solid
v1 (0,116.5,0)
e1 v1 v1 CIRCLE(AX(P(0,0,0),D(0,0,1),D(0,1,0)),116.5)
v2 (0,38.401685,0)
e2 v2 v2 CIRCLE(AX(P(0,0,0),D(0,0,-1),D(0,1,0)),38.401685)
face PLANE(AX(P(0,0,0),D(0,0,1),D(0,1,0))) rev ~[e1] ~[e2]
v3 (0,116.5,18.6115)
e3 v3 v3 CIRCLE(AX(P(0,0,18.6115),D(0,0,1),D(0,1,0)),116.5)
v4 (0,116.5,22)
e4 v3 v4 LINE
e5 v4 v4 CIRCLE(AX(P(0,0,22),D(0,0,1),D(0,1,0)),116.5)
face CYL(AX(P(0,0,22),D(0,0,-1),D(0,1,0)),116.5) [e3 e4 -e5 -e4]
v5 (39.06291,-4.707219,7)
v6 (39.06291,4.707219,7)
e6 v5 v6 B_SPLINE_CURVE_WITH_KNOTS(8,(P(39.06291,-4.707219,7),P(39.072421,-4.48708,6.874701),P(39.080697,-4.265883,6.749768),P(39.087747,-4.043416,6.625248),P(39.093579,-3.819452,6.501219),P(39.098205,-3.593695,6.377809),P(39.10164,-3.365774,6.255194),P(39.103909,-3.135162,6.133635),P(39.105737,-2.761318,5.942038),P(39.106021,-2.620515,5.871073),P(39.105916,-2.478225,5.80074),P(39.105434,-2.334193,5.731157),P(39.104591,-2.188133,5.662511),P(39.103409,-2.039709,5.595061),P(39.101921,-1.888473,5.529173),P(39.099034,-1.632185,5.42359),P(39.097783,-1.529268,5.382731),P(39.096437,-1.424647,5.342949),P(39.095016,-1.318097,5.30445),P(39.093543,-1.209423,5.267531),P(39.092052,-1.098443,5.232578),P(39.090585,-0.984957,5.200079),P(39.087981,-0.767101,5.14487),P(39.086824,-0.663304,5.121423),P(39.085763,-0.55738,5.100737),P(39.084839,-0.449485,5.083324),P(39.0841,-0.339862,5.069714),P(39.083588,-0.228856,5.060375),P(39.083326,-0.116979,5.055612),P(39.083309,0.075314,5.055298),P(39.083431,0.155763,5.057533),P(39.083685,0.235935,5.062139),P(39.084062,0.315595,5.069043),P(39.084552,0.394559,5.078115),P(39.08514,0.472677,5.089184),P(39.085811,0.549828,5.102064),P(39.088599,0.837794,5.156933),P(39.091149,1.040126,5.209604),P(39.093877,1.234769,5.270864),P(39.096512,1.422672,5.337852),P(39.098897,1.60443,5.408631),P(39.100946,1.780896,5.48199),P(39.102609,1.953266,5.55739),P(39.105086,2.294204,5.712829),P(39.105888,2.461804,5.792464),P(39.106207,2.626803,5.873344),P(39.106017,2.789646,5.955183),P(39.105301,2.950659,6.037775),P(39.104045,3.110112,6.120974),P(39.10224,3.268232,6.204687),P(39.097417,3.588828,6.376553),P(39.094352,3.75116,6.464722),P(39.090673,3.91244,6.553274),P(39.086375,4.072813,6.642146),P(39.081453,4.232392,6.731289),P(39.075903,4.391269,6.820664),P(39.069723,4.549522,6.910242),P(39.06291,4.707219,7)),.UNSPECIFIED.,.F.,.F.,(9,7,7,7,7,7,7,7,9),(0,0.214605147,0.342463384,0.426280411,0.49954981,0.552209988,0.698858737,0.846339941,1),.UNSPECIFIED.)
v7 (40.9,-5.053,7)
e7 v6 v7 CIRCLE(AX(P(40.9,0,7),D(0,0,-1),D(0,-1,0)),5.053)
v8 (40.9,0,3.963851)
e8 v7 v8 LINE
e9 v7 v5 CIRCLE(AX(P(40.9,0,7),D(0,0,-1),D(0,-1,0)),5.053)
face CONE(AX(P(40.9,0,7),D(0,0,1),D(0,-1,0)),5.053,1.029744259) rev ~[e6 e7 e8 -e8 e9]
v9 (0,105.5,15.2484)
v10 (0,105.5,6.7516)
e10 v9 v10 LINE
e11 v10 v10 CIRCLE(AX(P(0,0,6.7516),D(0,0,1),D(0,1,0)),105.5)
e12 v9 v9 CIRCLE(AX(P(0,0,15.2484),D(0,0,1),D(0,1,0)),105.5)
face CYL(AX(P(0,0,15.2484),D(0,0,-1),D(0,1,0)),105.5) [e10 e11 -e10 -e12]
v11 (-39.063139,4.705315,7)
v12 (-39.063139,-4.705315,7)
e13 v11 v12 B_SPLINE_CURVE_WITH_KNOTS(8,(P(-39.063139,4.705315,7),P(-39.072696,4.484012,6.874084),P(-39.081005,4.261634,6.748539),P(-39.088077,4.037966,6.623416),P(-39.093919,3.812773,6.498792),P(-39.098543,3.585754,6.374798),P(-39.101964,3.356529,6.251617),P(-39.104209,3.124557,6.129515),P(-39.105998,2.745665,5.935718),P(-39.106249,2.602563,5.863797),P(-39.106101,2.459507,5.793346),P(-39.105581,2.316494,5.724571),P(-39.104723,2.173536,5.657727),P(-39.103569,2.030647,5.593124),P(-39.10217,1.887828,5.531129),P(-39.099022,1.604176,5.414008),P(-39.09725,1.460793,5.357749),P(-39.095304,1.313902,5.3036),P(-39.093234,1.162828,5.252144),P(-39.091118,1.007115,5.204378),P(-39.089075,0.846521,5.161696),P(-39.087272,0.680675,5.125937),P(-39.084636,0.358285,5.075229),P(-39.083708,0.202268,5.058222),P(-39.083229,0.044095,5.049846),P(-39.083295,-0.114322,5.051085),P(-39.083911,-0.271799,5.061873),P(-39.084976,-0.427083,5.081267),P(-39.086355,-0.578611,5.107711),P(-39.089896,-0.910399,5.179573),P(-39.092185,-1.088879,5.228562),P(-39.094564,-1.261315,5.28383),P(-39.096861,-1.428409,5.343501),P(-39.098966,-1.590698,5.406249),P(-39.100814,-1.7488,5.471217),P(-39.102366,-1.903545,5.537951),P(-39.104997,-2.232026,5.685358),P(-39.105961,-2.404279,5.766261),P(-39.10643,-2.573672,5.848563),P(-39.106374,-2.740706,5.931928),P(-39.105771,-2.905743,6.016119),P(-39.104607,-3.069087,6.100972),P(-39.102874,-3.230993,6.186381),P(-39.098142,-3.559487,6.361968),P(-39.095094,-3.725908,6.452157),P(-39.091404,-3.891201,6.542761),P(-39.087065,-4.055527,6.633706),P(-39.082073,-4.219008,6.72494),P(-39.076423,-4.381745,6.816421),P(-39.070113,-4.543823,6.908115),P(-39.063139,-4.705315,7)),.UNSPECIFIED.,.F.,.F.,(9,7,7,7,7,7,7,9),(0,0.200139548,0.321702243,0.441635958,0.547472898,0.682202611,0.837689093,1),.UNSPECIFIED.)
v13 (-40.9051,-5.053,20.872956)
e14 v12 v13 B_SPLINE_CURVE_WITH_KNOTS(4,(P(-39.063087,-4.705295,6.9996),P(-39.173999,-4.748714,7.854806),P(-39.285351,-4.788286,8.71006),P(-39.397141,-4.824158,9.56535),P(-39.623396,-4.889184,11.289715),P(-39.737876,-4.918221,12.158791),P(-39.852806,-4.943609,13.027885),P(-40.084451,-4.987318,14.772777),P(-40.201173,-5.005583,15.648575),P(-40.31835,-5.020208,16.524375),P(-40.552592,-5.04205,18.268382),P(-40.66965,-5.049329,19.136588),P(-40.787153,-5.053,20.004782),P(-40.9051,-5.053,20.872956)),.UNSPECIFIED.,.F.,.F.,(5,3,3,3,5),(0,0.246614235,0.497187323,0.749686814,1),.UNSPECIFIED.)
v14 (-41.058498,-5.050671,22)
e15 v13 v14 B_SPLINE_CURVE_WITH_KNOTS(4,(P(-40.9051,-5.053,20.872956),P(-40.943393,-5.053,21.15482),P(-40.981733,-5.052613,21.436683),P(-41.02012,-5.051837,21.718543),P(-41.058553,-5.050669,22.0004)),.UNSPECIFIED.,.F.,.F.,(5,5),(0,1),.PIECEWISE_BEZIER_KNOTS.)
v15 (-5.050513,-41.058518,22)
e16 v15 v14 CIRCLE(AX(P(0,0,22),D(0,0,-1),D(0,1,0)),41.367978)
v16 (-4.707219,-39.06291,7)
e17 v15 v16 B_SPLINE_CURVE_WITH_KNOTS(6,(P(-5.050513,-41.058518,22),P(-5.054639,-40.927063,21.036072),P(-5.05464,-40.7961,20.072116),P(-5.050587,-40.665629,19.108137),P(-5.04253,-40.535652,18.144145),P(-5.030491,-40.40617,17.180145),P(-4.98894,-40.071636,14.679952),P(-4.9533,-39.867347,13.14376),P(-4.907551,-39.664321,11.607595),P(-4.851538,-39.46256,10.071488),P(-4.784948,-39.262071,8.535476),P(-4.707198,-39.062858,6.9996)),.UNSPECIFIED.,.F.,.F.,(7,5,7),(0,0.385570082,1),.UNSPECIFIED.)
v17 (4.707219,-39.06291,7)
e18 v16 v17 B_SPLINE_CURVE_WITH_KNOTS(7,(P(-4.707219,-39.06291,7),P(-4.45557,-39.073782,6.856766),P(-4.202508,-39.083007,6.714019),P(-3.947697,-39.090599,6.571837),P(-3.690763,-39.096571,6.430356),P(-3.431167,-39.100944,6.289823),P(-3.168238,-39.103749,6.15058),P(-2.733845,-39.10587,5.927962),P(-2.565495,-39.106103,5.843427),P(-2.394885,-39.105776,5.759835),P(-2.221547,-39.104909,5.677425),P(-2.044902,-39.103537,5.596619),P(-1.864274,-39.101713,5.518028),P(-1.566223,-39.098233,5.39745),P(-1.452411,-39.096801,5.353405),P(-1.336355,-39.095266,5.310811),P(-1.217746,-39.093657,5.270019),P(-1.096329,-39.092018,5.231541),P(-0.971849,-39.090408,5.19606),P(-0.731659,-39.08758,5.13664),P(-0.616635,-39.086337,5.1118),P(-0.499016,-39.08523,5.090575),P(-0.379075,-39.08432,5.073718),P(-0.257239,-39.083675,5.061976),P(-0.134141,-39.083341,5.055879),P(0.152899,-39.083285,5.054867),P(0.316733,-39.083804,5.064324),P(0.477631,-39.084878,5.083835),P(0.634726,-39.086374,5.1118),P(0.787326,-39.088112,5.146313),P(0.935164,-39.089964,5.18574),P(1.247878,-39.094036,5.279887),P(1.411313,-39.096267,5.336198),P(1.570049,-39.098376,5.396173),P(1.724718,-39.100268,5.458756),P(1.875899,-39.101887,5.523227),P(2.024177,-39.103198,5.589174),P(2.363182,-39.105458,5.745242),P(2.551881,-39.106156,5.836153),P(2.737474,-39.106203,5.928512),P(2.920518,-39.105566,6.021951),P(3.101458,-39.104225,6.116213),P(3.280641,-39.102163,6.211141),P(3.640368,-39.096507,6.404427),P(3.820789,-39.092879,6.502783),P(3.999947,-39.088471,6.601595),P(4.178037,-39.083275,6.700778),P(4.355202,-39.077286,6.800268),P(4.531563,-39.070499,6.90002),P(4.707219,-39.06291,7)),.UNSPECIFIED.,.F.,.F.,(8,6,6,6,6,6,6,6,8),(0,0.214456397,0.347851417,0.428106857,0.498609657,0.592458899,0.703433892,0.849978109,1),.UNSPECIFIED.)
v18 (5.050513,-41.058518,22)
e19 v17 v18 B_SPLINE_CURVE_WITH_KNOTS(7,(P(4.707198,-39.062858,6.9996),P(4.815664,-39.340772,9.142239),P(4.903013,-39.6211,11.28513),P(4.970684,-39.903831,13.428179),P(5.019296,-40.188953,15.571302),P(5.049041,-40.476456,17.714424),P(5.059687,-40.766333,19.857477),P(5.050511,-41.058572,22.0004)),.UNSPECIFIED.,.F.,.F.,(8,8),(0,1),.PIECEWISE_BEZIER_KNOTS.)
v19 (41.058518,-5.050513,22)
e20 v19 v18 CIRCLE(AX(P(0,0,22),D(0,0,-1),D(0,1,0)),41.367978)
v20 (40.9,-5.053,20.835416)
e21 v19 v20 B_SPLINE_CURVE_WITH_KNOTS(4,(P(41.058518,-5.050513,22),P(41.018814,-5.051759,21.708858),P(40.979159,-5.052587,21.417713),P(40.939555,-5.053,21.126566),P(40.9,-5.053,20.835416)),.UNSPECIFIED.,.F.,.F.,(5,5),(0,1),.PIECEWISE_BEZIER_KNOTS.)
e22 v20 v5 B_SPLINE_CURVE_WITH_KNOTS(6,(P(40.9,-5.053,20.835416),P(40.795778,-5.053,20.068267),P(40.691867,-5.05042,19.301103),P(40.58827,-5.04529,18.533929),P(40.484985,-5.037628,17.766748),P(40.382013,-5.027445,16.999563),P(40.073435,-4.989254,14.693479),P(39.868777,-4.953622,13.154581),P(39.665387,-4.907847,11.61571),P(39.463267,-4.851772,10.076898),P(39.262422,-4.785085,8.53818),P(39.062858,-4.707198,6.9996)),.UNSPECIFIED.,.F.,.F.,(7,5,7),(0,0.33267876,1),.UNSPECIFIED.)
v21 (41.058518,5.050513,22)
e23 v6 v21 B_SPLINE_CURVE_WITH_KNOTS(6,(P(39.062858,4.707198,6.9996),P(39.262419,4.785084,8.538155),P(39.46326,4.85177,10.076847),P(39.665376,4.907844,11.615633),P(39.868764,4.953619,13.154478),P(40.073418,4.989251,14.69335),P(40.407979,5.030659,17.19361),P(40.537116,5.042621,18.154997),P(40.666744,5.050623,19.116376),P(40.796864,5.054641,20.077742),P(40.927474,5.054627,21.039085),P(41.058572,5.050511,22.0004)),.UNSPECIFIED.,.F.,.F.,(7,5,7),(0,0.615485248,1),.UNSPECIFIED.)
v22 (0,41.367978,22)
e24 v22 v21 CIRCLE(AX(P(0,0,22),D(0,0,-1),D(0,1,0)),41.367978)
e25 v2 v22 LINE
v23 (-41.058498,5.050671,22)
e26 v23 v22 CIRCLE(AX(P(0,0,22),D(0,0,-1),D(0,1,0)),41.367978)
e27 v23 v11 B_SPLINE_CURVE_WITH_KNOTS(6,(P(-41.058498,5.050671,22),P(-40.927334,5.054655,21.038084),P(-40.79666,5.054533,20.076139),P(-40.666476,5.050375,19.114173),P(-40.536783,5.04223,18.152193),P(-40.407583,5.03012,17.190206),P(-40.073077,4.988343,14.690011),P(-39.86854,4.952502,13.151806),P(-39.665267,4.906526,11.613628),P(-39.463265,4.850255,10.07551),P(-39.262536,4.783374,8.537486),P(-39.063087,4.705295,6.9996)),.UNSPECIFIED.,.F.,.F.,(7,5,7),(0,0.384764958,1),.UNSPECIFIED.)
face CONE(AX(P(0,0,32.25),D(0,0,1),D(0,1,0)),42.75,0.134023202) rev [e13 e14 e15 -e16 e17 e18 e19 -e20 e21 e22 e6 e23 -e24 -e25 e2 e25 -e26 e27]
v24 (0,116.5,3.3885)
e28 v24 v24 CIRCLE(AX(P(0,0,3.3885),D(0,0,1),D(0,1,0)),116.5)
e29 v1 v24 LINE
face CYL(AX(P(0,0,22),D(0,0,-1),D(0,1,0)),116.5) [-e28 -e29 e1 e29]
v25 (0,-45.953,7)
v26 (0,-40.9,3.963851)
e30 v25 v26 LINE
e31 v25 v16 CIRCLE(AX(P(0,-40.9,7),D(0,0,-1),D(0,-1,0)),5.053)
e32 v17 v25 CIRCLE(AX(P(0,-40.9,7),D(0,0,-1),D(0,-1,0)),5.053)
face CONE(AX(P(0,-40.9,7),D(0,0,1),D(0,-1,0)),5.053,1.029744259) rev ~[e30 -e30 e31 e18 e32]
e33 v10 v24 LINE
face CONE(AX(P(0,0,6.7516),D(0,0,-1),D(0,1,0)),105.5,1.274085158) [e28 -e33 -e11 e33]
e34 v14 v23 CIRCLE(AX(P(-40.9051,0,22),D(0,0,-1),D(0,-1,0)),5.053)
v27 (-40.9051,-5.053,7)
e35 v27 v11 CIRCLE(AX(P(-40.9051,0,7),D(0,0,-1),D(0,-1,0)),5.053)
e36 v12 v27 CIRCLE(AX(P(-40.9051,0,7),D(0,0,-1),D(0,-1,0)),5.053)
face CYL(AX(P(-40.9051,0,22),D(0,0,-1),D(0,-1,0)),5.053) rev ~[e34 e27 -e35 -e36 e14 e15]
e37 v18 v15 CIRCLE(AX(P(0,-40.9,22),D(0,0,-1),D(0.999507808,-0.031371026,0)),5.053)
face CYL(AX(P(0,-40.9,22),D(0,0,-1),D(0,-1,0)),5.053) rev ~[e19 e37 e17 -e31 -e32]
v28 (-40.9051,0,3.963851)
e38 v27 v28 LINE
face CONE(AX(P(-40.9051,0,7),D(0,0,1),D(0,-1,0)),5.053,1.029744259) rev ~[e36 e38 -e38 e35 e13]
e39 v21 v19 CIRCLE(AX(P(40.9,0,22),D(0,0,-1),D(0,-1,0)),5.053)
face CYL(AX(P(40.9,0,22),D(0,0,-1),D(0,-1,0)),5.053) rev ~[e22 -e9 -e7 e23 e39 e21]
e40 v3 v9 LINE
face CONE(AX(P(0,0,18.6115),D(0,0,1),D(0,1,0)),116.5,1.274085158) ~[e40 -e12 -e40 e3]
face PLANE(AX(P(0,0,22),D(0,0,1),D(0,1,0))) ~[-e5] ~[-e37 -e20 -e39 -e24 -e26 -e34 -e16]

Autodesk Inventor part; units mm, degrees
ref_plane "XZ Plane" through (0, 0, 0) normal (0, 1, 0) x (-1, 0, 0)
ref_plane "XY Plane" through (0, 0, 0) normal (0, 0, 1) x (1, 0, 0)
sketch "Esquisse principale" plane through (0, 0, 0) normal (1, 0, 0) x (0, 1, 0)
  line L0 (0, 22) -> (116.5, 22)
  line L1 (116.5, 22) -> (116.5, 18.6115)
  line L2 (116.5, 18.6115) -> (105.5, 15.2484)
  line L3 (105.5, 15.2484) -> (105.5, 6.7516)
  line L4 (105.5, 6.7516) -> (116.5, 3.3885)
  line L5 (116.5, 3.3885) -> (116.5, 0)
  line L6 (116.5, 0) -> (0, 0)
  line L7 (114.5, 18) -> (114.5, 4) construction
  line L8 (105.5, 11) -> (114.5, 11) construction
  line L9 (116.5, 18.6115) -> (116.5, 3.3885)
  line L10 (0, -4.4) -> (0, 26.4) projected
  line L11 (0, 0) -> (0, 22)
  dimension "d0" = 14
  dimension "d1" = 34
  dimension "d2" = 2
  dimension "d6" = 22
  dimension "d21" = 229
  dimension "d25" = 11
  dimension "d27" = 11
ref_plane "Plan de courroie" through (0, 105.5, 11) normal (0, 0, 1) x (1, 0, 0)
revolve "Corps" add sketch "Esquisse principale" angle 360 about axis through (0, 0, -10) along (0, 0, 1)
revolve "Bord" cut sketch "Esquisse principale" angle 360 about axis through (0, 0, -10) along (0, 0, 1) contours L9 L4 L3 L2
fillet "Congé externe" [suppressed]
fillet "Congé interne" [suppressed]
sketch "Esquisse4" plane through (0, 0, 0) normal (1, 0, 0) x (0, 1, 0)
  line L0 (0, -20.2967) -> (0, 37.5815)
  line L1 (12.5, 32.25) -> (12.5, -12.25)
  line L2 (12.5, -12.25) -> (36.75, -12.25)
  line L3 (12.5, 32.25) -> (42.75, 32.25)
  line L4 (42.75, 32.25) -> (36.75, -12.25)
  line L5 (-116.5, 0) -> (116.5, 0) projected
  line L6 (12.5, 32.25) -> (0, 32.25)
  line L7 (12.5, -12.25) -> (0, -12.25)
  line L8 (0, -12.25) -> (0, 32.25)
  point P0 (0, 0)
  point P1 (0, 0)
  point P2 (12.5, 0)
  dimension "d48" = 12.5
  dimension "d49" = 73.5
  dimension "d50" = 85.5
  dimension "d51" = 44.5
  dimension "d52" = 12.25
revolve "Révolution3" cut sketch "Esquisse4" angle 360 about axis through (0, 0, -20.2967) along (0, 0, 1) contours L0 L6 L1 L5 | L1 L5 L4 L2 | L1 L3 L4 L5
sketch "Esquisse5" plane through (0, 0, 22) normal (0, 0, 1) x (1, 0, 0)
  line L0 (0, 0) -> (97.3173, 0)
  line L1 (0, 0) -> (-92.8604, 0)
  line L2 (0, 0) -> (0, -102.459)
  circle A0 centre (0, 0) radius 40.9
  point P0 (0, 0)
  point P1 (0, -40.9)
  point P2 (-40.9051, 0)
  point P3 (40.9, 0)
  dimension "d68" = 81.8
hole "Perçage3" at (0, -40.9, 22) at (-40.9051, 0, 22) at (40.9, 0, 22) direction (0, 0, -1) diameter 10.106 depth 15 tip angle 118 thread size "M12x1.75" class "6H" standard "ANSI Metric M Profile"
equation "\"d0\" = da_Bw"
equation "\"d1\" = da_Alfa"
equation "\"d2\" = da_c"
equation "\"d21\" = da_Dw"
equation "\"d25\" = da_Hd"
equation "\"d27\" = da_Se"
equation "\"da_r1\" = 0"
equation "\"da_r2\" = 0"
equation "\"d5\" = da_Se"
equation "\"da_Bw\" = 14"
equation "\"da_Alfa\" = 34deg"
equation "\"da_c\" = 2"
equation "\"da_Dw\" = 229"
equation "\"da_Hd\" = 11"
equation "\"da_Se\" = 11"
equation "\"da_Sg\" = 12"
properties part number "Poulie à gorge1" material "Steel"
